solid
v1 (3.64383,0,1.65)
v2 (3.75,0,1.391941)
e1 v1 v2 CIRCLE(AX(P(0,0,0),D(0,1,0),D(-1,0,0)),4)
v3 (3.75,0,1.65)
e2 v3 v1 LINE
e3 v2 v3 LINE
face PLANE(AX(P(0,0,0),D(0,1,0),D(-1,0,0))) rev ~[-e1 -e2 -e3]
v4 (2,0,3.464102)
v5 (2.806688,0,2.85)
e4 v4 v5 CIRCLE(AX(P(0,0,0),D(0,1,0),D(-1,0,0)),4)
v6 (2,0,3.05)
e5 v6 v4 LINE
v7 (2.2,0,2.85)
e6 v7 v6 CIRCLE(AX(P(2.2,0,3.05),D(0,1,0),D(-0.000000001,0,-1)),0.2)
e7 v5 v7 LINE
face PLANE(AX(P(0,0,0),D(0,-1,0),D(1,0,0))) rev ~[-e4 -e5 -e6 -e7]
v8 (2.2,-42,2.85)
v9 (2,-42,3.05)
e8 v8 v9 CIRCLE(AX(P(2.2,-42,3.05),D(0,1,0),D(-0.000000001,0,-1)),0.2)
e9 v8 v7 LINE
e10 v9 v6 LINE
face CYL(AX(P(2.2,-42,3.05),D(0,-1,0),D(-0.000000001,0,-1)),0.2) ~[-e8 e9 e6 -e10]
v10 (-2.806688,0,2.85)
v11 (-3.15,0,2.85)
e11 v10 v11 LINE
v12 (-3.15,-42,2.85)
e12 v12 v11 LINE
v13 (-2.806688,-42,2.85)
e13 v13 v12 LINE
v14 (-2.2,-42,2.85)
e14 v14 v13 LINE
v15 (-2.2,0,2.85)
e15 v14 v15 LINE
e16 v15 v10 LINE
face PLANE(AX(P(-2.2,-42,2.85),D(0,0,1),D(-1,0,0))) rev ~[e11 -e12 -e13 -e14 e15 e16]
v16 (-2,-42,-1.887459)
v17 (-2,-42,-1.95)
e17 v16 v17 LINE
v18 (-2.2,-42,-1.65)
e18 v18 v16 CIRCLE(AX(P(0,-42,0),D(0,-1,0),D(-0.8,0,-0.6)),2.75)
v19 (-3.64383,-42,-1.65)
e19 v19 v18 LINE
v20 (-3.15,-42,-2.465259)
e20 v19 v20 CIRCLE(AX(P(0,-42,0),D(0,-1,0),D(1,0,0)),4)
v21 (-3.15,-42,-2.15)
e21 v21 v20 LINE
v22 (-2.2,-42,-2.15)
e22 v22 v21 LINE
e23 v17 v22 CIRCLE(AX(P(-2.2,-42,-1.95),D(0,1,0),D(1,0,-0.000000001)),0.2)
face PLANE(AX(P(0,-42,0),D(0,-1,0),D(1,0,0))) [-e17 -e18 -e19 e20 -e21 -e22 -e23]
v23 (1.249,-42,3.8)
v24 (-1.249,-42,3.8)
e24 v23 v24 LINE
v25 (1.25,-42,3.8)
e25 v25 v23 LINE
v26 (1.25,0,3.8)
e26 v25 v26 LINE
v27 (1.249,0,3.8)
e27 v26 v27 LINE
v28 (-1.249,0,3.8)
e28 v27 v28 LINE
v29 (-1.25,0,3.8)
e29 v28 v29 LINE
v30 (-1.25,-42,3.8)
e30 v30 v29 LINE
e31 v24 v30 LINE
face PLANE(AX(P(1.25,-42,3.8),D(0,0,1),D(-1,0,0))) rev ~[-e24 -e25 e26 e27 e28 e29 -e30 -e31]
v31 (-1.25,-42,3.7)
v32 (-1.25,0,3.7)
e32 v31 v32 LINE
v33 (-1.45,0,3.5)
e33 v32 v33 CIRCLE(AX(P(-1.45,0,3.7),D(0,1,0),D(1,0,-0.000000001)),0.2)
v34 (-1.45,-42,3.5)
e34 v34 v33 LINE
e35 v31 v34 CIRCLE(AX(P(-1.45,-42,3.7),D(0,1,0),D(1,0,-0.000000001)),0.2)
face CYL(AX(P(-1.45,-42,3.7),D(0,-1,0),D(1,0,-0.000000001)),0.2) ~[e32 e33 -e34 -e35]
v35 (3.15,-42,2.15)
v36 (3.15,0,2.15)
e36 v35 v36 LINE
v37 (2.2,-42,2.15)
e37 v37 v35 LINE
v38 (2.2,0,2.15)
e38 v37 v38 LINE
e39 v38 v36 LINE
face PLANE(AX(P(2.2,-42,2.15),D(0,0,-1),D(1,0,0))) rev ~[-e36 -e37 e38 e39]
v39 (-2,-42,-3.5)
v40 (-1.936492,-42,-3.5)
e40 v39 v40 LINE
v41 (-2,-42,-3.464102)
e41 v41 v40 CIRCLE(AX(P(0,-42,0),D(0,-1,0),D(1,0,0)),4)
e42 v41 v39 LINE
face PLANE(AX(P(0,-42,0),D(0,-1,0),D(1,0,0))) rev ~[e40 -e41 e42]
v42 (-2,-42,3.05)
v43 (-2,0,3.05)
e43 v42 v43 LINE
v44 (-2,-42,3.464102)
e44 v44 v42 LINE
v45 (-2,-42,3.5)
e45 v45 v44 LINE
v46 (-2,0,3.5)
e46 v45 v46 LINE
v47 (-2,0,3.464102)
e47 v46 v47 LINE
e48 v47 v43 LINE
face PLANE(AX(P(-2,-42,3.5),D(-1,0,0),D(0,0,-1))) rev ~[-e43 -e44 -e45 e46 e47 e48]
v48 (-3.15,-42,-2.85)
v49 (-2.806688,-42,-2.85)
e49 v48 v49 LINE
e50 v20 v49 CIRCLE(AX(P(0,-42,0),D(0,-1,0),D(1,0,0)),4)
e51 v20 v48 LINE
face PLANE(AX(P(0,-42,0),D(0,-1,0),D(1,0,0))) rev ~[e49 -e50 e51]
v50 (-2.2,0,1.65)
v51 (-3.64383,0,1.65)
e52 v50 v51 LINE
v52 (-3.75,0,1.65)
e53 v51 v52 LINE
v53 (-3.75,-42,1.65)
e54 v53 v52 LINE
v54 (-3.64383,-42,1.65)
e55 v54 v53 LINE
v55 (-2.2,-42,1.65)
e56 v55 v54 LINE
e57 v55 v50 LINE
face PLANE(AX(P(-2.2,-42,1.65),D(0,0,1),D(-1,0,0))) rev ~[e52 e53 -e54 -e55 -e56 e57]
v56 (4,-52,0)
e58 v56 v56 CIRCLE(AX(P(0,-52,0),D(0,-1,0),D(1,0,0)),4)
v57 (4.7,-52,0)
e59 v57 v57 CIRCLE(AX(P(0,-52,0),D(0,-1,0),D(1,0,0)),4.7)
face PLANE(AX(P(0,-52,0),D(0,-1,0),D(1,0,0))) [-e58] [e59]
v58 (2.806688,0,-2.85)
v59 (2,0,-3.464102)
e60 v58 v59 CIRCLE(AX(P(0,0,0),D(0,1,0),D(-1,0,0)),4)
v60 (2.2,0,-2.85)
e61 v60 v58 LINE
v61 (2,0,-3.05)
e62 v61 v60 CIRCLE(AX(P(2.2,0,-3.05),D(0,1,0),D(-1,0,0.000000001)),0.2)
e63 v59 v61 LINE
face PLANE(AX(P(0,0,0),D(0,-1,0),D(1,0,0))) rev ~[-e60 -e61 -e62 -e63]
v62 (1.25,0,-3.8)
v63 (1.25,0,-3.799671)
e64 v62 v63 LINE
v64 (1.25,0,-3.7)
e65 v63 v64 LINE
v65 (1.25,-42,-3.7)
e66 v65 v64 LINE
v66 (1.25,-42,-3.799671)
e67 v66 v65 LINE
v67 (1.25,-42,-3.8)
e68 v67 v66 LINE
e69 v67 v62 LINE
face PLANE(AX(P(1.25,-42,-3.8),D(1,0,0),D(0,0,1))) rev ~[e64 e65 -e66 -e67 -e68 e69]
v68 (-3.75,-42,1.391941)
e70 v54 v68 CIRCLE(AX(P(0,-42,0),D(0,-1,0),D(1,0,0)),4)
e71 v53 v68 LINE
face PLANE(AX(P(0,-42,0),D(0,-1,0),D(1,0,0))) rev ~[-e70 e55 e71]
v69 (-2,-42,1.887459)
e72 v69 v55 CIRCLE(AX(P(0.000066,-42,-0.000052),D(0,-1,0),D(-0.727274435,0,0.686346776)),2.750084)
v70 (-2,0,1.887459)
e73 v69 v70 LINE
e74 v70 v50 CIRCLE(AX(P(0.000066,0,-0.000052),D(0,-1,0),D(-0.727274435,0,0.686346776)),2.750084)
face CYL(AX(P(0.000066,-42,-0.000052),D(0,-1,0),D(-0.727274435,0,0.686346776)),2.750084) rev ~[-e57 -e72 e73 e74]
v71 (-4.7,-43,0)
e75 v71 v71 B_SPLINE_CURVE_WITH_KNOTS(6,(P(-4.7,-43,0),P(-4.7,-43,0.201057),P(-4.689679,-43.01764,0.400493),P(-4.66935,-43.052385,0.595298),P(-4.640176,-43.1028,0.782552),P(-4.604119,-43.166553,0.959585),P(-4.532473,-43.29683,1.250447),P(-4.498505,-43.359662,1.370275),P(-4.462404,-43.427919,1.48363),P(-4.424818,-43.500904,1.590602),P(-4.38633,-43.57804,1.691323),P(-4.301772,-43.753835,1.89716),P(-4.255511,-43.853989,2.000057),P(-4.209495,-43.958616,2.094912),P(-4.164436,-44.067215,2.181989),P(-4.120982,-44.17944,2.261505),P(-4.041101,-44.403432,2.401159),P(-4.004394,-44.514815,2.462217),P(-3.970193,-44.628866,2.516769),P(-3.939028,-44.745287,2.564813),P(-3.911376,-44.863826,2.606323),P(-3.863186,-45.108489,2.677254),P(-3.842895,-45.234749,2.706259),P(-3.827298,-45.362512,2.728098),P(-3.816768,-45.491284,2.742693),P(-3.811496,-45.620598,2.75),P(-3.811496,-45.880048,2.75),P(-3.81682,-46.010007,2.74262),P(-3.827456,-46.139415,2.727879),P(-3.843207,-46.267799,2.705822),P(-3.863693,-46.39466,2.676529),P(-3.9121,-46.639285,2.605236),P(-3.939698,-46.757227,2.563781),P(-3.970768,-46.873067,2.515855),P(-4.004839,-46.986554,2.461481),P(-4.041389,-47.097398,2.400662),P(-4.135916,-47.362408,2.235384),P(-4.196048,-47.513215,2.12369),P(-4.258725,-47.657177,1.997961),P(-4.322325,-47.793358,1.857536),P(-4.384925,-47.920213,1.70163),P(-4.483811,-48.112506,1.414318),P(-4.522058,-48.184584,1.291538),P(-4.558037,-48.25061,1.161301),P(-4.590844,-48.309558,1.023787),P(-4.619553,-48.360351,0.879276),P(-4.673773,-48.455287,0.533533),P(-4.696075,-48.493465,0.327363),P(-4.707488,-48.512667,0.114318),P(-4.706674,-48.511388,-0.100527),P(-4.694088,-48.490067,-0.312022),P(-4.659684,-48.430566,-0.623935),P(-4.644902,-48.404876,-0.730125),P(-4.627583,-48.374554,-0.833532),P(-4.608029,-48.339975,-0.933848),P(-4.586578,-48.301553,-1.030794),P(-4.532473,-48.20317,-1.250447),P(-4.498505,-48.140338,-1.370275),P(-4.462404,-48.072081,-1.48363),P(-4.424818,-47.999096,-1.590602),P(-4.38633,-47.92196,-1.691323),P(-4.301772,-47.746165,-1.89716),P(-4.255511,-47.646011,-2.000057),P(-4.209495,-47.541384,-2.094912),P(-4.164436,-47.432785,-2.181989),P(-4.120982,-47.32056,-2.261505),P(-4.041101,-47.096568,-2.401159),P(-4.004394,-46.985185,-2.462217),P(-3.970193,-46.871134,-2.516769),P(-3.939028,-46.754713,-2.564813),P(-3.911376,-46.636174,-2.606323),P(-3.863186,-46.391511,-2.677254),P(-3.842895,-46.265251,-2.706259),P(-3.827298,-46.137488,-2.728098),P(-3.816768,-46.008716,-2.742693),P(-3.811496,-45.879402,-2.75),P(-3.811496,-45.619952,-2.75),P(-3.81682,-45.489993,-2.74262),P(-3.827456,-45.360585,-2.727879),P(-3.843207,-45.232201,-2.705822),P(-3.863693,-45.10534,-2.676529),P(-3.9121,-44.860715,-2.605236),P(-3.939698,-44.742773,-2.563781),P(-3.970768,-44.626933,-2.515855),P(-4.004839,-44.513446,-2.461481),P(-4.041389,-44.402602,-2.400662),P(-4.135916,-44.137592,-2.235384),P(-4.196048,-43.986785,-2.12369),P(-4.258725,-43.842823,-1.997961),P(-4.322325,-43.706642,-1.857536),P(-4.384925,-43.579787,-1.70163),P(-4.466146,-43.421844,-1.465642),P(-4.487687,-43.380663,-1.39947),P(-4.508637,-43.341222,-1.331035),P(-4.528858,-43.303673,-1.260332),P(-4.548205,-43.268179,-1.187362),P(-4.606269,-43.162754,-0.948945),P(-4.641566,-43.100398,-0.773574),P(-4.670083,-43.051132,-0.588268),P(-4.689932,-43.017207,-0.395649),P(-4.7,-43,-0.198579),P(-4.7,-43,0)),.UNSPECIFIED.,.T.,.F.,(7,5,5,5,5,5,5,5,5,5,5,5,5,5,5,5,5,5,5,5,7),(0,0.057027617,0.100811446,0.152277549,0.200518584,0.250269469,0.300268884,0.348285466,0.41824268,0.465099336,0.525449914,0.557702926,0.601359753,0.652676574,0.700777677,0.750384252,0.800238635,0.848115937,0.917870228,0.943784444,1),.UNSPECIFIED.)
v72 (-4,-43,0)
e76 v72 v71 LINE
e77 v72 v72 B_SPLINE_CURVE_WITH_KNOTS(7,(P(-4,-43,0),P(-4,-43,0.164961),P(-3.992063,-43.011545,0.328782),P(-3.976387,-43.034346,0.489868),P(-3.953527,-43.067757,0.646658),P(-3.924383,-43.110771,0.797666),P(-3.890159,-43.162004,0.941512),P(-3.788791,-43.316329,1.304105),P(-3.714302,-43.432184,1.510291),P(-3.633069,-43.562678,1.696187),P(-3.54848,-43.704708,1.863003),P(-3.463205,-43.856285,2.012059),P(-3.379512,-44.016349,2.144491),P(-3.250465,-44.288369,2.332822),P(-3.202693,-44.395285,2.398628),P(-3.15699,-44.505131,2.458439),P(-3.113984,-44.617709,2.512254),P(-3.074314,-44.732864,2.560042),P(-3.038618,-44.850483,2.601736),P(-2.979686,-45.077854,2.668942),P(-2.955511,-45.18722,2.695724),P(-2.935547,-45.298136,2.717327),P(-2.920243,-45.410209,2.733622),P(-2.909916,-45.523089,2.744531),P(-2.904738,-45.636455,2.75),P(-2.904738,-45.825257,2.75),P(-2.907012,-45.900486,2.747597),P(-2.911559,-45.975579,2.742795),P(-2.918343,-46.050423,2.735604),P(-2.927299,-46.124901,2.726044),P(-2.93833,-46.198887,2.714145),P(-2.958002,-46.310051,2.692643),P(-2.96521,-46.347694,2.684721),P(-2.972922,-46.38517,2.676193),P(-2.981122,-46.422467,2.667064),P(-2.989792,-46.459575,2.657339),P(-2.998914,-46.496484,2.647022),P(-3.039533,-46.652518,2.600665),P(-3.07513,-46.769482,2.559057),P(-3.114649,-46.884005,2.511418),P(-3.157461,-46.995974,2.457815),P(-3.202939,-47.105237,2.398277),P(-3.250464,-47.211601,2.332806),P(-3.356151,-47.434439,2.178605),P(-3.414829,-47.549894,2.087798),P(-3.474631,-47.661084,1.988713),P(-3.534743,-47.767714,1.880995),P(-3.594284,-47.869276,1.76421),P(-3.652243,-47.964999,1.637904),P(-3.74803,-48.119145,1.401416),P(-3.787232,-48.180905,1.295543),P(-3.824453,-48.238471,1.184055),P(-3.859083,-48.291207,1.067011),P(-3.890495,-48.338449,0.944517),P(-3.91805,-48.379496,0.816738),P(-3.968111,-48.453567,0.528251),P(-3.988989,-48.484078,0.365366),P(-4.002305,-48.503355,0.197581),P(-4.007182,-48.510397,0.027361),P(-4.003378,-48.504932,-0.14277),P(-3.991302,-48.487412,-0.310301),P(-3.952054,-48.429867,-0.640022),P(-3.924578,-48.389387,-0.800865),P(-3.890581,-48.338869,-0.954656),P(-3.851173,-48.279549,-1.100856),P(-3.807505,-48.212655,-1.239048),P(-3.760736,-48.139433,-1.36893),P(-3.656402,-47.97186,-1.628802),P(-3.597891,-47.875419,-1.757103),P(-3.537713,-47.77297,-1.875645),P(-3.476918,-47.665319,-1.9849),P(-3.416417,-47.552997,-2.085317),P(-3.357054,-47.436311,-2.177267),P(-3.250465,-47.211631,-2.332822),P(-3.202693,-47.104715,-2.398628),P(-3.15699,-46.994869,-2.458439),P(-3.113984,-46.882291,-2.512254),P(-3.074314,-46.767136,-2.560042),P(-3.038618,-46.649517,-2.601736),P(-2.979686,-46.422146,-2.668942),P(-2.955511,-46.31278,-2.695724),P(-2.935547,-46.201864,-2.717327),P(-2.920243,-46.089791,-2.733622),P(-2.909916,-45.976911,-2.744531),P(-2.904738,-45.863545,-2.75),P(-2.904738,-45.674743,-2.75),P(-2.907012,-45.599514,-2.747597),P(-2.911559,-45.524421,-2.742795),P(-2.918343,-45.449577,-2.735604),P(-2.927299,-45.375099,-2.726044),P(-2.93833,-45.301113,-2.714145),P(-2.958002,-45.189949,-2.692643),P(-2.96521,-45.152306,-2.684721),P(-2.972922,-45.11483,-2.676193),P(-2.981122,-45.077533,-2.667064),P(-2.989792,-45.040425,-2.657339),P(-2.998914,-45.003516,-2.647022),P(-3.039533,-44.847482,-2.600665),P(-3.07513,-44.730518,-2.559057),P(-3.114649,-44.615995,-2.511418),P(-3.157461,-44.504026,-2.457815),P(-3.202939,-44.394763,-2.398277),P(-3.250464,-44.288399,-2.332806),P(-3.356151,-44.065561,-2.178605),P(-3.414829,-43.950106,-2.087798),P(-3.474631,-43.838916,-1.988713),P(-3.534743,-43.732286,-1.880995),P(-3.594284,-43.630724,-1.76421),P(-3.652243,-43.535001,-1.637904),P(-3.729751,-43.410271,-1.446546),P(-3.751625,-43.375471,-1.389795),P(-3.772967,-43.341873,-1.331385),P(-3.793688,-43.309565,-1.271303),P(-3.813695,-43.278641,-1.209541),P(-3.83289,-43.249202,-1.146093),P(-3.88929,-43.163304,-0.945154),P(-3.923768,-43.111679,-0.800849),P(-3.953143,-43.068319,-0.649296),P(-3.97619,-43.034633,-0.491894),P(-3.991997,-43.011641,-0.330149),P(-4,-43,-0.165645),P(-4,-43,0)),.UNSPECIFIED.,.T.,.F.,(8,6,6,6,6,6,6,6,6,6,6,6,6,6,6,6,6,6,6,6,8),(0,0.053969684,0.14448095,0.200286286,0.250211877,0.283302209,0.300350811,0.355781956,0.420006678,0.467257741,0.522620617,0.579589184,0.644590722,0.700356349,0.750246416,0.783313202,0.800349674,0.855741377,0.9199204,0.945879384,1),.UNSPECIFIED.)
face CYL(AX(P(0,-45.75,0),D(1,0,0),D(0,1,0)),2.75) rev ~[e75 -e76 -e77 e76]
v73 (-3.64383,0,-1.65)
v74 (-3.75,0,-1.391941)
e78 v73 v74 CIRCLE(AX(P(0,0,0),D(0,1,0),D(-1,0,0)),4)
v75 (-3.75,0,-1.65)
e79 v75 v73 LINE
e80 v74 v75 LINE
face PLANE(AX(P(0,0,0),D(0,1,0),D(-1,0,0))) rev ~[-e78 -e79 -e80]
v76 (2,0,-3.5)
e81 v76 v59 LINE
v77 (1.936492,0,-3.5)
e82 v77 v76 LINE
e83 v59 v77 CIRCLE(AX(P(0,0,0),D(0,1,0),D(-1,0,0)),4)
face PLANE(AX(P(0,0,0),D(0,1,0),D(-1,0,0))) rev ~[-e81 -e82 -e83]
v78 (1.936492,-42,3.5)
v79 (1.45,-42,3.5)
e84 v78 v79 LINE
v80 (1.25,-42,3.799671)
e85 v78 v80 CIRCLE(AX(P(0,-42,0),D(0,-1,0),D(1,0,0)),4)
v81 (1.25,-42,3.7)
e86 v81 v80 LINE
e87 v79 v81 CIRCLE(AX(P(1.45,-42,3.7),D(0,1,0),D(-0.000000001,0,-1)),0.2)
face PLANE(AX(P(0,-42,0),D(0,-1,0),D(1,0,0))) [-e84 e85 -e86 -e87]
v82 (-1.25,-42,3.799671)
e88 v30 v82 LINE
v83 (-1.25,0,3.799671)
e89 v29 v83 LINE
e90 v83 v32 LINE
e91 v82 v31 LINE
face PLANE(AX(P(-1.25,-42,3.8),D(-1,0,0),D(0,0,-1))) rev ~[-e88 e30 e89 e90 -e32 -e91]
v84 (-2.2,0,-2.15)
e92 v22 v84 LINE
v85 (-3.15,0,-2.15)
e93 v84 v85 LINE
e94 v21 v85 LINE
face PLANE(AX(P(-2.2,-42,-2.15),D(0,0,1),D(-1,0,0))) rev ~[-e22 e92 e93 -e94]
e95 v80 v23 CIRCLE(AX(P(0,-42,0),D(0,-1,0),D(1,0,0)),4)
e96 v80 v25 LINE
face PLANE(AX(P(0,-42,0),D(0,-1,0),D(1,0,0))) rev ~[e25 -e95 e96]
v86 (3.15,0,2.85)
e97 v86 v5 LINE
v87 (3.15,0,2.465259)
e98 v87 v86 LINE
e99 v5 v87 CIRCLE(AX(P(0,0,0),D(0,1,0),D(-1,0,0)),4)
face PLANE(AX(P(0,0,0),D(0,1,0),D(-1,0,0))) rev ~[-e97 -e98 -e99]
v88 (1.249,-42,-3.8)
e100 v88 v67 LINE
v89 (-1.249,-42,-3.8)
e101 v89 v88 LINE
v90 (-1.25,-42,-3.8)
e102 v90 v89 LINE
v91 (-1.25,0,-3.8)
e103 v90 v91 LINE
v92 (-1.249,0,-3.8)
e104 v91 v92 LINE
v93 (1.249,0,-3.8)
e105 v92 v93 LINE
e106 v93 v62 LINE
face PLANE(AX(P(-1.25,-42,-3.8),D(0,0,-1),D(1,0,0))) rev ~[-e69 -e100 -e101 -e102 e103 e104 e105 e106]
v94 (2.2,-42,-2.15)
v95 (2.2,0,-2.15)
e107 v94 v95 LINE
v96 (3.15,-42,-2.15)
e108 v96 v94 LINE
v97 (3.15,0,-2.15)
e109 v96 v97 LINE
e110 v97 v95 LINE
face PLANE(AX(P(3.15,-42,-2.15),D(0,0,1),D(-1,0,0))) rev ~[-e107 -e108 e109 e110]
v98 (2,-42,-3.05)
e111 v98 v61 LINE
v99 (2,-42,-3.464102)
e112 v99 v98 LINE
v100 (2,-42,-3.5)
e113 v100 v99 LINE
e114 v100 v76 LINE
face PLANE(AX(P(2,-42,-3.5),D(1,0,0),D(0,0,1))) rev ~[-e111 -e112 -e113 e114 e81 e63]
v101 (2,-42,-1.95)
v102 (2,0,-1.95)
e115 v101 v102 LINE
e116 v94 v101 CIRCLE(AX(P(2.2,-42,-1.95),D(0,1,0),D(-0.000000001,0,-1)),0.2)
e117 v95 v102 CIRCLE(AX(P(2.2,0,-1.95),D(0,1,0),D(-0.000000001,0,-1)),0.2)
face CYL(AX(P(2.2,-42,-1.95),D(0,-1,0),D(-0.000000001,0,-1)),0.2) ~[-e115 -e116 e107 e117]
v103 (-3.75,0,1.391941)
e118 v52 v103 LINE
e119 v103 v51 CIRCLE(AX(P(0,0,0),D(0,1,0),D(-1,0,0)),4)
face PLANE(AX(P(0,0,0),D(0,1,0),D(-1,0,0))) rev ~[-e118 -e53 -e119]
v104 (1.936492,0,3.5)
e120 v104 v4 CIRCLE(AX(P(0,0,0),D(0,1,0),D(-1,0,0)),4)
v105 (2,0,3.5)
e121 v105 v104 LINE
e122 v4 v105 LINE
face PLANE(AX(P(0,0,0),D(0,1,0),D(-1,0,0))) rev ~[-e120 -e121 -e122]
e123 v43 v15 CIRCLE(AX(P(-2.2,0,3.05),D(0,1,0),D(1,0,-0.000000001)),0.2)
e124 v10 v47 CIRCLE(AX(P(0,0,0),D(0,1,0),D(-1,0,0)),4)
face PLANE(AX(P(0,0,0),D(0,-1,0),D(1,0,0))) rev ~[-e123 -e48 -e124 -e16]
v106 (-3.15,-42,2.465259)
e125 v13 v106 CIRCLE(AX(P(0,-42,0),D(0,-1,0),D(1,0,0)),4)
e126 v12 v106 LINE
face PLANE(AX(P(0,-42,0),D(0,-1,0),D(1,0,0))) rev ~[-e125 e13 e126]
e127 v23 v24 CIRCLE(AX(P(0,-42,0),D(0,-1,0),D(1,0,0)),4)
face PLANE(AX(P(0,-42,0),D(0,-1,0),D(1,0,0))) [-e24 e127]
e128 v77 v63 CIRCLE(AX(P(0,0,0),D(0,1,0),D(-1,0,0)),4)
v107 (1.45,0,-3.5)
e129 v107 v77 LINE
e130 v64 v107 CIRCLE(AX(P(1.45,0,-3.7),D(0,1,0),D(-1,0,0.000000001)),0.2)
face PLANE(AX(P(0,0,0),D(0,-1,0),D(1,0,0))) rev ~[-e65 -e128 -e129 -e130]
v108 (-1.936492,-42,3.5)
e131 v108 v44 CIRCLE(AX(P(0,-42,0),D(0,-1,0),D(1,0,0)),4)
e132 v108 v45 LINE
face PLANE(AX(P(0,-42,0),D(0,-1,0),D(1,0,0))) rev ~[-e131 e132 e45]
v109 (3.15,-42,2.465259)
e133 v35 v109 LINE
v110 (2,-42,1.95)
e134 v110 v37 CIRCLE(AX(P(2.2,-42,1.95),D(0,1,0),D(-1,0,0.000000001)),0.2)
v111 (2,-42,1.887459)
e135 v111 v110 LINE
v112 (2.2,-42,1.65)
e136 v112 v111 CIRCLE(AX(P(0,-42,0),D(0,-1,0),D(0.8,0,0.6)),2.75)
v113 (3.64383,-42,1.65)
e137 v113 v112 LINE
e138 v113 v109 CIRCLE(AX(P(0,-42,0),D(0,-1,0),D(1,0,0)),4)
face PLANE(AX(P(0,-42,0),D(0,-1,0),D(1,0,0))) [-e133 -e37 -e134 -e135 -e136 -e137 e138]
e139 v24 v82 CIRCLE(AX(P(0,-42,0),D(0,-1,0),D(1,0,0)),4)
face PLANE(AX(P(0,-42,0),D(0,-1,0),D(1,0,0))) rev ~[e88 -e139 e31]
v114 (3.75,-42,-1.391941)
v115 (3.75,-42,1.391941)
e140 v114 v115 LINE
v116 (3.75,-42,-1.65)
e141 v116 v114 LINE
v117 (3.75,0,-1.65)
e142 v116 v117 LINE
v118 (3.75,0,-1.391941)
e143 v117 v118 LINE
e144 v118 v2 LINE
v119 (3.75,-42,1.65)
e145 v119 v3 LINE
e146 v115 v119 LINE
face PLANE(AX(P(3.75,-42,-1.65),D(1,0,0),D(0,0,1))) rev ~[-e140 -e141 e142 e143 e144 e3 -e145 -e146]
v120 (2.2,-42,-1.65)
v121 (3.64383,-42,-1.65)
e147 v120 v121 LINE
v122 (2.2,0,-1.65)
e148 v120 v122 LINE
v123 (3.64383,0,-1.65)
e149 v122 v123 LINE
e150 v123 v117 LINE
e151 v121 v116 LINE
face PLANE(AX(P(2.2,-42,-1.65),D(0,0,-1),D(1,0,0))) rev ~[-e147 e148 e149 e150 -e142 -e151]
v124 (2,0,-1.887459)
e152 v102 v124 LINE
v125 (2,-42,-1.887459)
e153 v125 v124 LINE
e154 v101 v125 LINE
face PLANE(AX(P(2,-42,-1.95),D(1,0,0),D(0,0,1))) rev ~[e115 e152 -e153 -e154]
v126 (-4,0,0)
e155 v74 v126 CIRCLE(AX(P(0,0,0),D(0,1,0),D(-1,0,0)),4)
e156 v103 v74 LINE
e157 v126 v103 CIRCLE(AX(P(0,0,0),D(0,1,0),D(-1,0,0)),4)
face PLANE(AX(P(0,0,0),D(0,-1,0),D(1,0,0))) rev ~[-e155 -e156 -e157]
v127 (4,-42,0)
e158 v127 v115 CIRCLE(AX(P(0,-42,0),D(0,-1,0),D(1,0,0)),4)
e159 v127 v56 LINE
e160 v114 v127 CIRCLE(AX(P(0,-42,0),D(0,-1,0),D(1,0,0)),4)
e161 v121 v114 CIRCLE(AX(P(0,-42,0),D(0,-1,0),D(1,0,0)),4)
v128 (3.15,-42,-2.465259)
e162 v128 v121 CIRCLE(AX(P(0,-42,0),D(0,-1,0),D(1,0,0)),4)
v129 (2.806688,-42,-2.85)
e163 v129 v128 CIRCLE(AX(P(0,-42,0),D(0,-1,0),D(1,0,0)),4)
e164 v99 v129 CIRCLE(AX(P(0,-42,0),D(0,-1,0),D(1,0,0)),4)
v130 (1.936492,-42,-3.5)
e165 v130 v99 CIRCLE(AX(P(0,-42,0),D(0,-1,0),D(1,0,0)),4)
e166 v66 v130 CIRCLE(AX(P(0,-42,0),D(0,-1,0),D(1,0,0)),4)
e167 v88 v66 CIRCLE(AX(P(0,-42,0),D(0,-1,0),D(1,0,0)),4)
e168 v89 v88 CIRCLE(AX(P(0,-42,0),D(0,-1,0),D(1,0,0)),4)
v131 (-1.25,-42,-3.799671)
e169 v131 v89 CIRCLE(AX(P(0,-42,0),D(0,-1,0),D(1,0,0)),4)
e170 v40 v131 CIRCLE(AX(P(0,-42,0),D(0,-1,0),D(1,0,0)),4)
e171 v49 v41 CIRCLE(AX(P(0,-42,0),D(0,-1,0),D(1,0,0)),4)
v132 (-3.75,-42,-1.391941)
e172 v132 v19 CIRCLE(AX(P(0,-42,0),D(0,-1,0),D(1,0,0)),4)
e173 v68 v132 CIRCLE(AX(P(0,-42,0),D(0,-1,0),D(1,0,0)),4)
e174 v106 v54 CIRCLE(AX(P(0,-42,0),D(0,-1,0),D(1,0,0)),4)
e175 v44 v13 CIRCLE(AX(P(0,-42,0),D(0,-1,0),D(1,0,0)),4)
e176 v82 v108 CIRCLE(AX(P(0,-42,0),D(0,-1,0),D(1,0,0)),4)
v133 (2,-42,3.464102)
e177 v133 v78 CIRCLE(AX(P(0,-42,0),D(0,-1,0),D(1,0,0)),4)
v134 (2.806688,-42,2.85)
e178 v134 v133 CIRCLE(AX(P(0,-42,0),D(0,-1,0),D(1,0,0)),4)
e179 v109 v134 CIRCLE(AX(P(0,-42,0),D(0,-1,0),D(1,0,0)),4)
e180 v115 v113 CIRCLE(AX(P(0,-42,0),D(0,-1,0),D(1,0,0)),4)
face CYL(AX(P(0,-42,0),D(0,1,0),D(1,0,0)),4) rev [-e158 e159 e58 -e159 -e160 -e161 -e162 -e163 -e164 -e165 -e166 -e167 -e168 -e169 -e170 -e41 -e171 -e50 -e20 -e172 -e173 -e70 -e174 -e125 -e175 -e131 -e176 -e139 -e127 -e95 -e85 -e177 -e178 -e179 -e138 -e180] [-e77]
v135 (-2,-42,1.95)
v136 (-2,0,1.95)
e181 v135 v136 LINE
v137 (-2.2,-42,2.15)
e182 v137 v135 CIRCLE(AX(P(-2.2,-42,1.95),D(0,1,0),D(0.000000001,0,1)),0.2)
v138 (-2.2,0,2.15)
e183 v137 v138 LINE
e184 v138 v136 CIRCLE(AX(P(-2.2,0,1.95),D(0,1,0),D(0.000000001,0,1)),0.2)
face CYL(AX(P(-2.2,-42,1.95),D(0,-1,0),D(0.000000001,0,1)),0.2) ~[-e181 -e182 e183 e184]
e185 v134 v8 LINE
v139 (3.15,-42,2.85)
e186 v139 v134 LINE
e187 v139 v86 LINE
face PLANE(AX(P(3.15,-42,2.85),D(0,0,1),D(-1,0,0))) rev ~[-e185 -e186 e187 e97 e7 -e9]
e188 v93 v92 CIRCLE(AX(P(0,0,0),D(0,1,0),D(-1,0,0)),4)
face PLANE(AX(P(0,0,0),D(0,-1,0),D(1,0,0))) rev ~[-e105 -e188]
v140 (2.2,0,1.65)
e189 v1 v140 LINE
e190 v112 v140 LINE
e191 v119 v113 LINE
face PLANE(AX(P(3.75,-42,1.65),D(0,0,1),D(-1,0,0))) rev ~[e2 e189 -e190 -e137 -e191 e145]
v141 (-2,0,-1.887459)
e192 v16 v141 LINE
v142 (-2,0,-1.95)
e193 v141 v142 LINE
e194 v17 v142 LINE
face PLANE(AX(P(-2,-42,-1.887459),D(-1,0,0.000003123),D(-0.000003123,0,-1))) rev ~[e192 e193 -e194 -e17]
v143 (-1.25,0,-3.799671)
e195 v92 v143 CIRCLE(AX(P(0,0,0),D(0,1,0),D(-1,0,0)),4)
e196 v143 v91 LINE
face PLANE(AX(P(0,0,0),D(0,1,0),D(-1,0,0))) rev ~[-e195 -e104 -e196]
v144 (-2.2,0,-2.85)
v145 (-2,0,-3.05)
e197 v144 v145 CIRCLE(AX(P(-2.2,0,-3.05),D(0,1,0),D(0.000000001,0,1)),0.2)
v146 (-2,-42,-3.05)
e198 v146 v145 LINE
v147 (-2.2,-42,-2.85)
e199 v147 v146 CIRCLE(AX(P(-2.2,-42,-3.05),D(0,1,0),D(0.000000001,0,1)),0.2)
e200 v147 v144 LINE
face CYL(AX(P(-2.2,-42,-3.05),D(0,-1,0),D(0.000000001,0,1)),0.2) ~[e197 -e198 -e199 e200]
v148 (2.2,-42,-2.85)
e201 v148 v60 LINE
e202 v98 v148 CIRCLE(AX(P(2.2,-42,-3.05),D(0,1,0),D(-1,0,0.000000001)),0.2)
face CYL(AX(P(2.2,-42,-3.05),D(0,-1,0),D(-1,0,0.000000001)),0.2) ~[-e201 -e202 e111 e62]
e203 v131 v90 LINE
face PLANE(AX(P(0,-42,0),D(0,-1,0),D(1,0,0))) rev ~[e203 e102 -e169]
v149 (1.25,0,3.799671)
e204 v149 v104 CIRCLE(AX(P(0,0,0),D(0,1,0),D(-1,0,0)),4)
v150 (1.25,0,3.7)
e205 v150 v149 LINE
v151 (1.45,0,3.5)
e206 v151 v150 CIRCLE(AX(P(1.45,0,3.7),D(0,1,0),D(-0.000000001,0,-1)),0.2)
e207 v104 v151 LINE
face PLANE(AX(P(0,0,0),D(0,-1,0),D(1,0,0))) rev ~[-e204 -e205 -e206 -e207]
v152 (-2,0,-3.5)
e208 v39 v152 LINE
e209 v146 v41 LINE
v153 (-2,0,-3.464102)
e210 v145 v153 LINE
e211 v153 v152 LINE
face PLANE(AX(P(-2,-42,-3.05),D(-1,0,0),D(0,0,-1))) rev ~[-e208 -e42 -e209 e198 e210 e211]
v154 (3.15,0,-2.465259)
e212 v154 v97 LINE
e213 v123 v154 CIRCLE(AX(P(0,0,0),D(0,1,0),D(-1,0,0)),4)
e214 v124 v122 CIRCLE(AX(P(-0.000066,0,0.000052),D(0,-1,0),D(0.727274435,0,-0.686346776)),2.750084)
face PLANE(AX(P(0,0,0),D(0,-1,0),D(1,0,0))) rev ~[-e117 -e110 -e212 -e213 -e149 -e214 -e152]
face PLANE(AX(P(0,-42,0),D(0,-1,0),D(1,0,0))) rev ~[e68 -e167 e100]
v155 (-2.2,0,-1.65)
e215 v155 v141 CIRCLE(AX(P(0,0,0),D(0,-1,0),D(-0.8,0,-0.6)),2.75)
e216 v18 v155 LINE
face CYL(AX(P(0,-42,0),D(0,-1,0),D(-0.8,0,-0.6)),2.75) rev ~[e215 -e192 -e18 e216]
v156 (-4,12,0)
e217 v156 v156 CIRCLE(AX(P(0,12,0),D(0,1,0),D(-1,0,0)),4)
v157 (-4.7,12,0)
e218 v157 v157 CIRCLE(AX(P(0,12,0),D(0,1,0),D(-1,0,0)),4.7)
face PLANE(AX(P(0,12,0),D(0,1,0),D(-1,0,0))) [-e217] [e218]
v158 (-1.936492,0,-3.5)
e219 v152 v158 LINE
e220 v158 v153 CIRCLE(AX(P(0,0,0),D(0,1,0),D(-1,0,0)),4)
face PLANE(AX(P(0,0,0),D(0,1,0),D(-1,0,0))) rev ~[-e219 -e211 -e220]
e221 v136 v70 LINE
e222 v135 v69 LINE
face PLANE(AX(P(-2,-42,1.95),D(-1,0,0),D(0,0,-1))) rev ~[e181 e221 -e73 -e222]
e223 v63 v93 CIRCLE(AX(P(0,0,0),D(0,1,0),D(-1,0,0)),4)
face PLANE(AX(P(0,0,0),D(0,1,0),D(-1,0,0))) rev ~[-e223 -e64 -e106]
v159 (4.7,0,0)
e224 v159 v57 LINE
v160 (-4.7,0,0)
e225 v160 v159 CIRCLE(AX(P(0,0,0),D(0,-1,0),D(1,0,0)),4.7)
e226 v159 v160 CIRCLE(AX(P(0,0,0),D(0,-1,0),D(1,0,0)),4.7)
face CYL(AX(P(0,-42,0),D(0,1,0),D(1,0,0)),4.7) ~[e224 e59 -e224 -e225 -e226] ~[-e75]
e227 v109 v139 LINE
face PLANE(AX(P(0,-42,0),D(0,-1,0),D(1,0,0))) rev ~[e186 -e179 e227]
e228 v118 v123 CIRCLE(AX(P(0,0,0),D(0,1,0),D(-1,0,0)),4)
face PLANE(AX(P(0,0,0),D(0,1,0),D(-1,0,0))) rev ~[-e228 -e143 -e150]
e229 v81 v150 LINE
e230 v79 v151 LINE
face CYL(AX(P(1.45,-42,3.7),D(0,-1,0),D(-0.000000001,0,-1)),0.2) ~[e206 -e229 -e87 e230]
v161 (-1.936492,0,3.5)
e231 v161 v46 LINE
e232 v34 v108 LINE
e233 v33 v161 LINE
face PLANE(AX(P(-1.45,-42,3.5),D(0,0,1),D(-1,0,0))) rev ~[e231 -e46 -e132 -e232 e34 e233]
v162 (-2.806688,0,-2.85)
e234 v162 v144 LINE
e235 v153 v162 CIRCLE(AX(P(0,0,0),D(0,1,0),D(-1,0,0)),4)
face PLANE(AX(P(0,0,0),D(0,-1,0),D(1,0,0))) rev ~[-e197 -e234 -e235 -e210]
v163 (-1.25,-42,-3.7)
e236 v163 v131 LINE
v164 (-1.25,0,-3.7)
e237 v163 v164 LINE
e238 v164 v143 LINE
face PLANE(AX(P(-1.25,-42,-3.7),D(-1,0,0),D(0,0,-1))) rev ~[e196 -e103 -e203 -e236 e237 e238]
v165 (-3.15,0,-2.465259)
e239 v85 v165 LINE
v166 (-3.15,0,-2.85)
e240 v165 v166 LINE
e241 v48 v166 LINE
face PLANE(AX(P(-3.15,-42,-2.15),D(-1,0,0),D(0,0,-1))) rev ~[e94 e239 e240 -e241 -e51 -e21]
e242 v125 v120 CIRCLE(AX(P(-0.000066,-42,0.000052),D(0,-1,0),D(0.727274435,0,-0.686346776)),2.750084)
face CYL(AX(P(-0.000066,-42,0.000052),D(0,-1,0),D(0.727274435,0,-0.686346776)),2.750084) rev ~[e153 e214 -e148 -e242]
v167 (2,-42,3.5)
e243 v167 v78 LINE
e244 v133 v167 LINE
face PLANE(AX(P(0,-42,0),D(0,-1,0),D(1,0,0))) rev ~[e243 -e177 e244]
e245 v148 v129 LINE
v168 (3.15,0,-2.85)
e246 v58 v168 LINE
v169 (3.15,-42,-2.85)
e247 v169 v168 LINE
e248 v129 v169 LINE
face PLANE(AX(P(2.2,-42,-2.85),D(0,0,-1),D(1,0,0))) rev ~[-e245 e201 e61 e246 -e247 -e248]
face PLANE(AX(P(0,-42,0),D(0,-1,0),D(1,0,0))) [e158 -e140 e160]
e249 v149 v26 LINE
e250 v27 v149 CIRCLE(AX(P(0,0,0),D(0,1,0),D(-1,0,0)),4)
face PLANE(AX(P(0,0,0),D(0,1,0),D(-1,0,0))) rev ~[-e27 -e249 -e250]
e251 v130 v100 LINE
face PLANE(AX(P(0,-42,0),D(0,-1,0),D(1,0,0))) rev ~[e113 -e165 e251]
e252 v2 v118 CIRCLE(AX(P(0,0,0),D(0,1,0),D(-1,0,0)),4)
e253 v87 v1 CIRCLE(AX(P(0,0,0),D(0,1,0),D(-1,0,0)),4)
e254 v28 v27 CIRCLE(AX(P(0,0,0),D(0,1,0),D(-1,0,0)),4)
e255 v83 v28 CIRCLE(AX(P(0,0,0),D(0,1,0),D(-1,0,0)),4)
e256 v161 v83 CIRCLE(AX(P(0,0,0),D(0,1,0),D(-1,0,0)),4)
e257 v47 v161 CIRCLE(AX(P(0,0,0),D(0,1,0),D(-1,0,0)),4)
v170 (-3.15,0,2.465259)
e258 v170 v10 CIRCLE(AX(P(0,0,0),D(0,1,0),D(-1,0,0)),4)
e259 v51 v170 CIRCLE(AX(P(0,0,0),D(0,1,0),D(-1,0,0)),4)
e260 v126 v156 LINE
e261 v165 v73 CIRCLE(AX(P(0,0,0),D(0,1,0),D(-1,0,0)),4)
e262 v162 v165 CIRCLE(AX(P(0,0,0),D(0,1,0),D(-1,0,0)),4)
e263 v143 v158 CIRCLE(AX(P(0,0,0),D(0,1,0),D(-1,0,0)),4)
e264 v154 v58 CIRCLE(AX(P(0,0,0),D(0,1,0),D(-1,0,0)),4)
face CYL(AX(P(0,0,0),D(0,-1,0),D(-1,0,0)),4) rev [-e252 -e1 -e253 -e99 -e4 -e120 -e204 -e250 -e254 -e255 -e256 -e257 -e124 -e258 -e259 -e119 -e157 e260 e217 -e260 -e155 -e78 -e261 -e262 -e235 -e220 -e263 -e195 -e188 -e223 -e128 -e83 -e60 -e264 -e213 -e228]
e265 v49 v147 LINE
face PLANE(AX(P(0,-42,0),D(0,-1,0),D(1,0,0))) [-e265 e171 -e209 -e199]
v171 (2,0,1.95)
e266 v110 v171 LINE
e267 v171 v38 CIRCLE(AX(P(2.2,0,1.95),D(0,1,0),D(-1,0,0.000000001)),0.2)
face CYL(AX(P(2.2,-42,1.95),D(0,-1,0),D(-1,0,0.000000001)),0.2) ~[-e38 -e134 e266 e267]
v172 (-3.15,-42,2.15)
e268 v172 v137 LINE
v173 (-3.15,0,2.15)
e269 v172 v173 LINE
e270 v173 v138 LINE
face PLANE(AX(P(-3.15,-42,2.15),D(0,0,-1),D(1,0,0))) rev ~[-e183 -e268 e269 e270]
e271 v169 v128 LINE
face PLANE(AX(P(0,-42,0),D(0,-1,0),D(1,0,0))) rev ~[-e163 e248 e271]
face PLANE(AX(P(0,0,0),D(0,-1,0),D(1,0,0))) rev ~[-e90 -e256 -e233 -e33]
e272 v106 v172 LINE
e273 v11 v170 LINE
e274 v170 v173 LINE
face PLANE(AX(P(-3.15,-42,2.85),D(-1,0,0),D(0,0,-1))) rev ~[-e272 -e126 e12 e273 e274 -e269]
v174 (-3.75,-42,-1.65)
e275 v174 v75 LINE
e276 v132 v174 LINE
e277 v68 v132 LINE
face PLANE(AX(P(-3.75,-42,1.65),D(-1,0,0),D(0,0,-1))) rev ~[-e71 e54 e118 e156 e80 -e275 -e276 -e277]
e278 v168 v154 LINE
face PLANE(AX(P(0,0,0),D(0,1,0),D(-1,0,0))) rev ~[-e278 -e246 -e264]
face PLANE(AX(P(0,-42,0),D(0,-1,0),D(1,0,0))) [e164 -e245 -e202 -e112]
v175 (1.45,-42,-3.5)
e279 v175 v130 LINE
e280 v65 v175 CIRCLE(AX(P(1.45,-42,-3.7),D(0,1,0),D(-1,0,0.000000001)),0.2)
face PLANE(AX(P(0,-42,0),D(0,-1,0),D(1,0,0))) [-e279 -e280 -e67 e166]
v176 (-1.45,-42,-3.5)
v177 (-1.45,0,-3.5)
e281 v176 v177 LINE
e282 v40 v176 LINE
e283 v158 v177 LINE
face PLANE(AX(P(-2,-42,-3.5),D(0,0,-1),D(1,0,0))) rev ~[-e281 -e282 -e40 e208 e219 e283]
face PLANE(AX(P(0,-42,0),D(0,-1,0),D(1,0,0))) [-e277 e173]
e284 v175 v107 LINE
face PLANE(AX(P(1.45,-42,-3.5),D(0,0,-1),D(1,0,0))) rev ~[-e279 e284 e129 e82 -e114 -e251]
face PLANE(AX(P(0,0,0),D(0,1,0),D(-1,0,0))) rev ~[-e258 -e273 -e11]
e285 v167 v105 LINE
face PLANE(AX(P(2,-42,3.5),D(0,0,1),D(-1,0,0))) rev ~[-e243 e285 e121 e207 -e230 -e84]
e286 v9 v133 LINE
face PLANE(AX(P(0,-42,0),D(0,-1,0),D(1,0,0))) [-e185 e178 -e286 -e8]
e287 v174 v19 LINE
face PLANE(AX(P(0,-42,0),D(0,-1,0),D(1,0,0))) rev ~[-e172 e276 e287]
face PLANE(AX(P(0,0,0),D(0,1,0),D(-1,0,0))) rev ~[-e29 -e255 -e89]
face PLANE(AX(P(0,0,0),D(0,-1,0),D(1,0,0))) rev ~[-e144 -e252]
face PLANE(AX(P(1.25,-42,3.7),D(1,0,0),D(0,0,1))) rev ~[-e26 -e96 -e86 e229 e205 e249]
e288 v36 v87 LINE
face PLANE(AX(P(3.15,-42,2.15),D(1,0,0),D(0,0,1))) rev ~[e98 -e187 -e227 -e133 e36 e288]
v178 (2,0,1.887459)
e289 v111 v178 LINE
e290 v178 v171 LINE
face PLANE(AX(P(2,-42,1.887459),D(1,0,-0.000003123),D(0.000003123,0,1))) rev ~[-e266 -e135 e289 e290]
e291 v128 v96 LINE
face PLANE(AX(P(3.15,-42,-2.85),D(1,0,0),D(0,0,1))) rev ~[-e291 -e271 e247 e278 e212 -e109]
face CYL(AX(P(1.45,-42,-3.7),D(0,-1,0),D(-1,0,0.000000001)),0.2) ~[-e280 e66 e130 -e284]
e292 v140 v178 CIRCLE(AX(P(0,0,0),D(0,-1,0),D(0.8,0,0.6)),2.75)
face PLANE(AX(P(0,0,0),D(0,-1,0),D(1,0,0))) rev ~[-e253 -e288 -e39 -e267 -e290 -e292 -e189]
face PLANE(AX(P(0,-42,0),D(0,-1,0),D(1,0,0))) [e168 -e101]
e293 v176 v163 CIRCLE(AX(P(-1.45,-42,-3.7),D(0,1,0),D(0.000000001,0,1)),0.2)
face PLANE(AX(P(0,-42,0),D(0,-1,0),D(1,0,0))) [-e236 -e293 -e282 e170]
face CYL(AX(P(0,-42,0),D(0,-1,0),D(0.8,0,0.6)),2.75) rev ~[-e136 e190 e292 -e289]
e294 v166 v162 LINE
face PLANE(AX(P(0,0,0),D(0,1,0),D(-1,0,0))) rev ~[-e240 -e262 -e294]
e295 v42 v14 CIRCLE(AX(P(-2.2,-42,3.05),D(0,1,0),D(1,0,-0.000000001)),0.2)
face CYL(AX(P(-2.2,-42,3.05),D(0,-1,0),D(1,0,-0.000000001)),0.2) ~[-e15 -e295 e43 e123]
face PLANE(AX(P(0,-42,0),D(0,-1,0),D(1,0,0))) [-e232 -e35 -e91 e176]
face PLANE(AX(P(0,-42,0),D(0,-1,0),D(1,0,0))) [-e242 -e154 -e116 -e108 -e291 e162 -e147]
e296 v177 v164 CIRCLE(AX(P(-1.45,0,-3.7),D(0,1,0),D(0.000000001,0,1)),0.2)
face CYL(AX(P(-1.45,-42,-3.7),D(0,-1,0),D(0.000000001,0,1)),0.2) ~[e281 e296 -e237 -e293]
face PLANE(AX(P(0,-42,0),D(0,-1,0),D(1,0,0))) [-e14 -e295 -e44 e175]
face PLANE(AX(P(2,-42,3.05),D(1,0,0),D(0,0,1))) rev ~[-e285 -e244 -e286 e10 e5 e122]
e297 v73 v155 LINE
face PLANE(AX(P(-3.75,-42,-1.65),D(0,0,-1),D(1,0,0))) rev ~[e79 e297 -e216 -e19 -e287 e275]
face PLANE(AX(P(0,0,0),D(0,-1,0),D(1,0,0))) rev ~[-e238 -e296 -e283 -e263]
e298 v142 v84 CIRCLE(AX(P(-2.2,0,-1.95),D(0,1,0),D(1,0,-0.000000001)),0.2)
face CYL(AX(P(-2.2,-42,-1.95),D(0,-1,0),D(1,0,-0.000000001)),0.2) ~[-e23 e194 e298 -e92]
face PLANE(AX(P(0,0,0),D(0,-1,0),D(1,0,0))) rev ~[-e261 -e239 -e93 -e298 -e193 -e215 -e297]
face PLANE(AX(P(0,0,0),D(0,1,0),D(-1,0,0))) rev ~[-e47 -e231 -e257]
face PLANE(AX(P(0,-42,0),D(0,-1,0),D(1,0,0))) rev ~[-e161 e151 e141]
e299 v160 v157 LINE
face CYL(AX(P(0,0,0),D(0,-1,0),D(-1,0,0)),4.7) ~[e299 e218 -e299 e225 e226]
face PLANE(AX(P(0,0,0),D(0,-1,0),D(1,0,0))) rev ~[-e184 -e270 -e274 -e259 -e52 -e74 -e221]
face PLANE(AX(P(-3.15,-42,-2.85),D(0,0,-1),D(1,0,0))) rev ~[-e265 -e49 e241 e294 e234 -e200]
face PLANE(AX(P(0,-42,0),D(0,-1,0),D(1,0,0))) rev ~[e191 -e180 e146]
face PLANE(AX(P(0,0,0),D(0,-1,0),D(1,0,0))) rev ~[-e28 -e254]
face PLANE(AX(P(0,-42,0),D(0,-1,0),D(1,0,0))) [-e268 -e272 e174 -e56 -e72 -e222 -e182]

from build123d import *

# Parameters (mm, degrees)
F3_R      = 4.7
F4_DEPTH  = 42
F8_DEPTH  = 42
F6_R      = 4.7
F6_R_2    = 4
F9_DEPTH  = 10
F7_R      = 4.7
F7_R_2    = 4
F10_DEPTH = 12
F11_R     = 2.75
F12_DEPTH = 4.701


# Not quite as in the source:
# - ends of sketch curves that miss each other by under 0.0002 mm in the source are joined


with BuildPart() as f4:
    # F3 (on Front) → F4 (new body)
    with BuildSketch(Plane.XZ):
        Circle(F3_R)
    extrude(amount=F4_DEPTH)

    # F5 (on face) → F8 (cut, through all)
    with BuildSketch(Plane.XZ.offset(42)):
        with BuildLine():
            Line((-1.25, -3.8), (0, -3.8))
            Line((0, -3.8), (1.25, -3.8))
            Line((1.25, -3.8), (1.25, -3.7))
            ThreePointArc((1.25, -3.7), (1.3085786438, -3.5585786438), (1.45, -3.5))
            Line((1.45, -3.5), (2, -3.5))
            Line((2, -3.5), (2, -3.05))
            ThreePointArc((2, -3.05), (2.0585786438, -2.9085786438), (2.2, -2.85))
            Line((2.2, -2.85), (3.15, -2.85))
            Line((3.15, -2.85), (3.15, -2.15))
            Line((3.15, -2.15), (2.2, -2.15))
            ThreePointArc((2.2, -2.15), (2.0585786438, -2.0914213562), (2, -1.95))
            Line((2, -1.95), (2, -1.887459))
            ThreePointArc((2, -1.887459), (2.1033535752, -1.771554046), (2.2, -1.65))
            Line((2.2, -1.65), (3.75, -1.65))
            Line((3.75, -1.65), (3.75, 0))
            Line((3.75, 0), (3.75, 1.65))
            Line((3.75, 1.65), (2.2, 1.65))
            ThreePointArc((2.2, 1.65), (2.1033535752, 1.771554046), (1.9999998047, 1.8874588157))
            Line((1.9999998047, 1.8874588157), (2, 1.95))
            ThreePointArc((2, 1.95), (2.0585786438, 2.0914213562), (2.2, 2.15))
            Line((2.2, 2.15), (3.15, 2.15))
            Line((3.15, 2.15), (3.15, 2.85))
            Line((3.15, 2.85), (2.2, 2.85))
            ThreePointArc((2.2, 2.85), (2.0585786438, 2.9085786438), (2, 3.05))
            Line((2, 3.05), (2, 3.5))
            Line((2, 3.5), (1.45, 3.5))
            ThreePointArc((1.45, 3.5), (1.3085786438, 3.5585786438), (1.25, 3.7))
            Line((1.25, 3.7), (1.25, 3.8))
            Line((1.25, 3.8), (0, 3.8))
            Line((0, 3.8), (-1.25, 3.8))
            Line((-1.25, 3.8), (-1.25, 3.7))
            ThreePointArc((-1.25, 3.7), (-1.3085786438, 3.5585786438), (-1.45, 3.5))
            Line((-1.45, 3.5), (-2, 3.5))
            Line((-2, 3.5), (-2, 3.05))
            ThreePointArc((-2, 3.05), (-2.0585786438, 2.9085786438), (-2.2, 2.85))
            Line((-2.2, 2.85), (-3.15, 2.85))
            Line((-3.15, 2.85), (-3.15, 2.15))
            Line((-3.15, 2.15), (-2.2, 2.15))
            ThreePointArc((-2.2, 2.15), (-2.0585786438, 2.0914213562), (-2, 1.95))
            Line((-2, 1.95), (-2, 1.887459))
            ThreePointArc((-2, 1.887459), (-2.1033535752, 1.771554046), (-2.2, 1.65))
            Line((-2.2, 1.65), (-3.75, 1.65))
            Line((-3.75, 1.65), (-3.75, 0))
            Line((-3.75, 0), (-3.75, -1.65))
            Line((-3.75, -1.65), (-2.2, -1.65))
            ThreePointArc((-2.2, -1.65), (-2.1033535752, -1.771554046), (-1.9999998047, -1.8874588157))
            Line((-1.9999998047, -1.8874588157), (-2, -1.95))
            ThreePointArc((-2, -1.95), (-2.0585786438, -2.0914213562), (-2.2, -2.15))
            Line((-2.2, -2.15), (-3.15, -2.15))
            Line((-3.15, -2.15), (-3.15, -2.85))
            Line((-3.15, -2.85), (-2.2, -2.85))
            ThreePointArc((-2.2, -2.85), (-2.0585786438, -2.9085786438), (-2, -3.05))
            Line((-2, -3.05), (-2, -3.5))
            Line((-2, -3.5), (-1.45, -3.5))
            ThreePointArc((-1.45, -3.5), (-1.3085786438, -3.5585786438), (-1.25, -3.7))
            Line((-1.25, -3.7), (-1.25, -3.8))
        make_face()
    extrude(amount=-F8_DEPTH, mode=Mode.SUBTRACT)

    # F6 (on face) → F9 (join)
    with BuildSketch(Plane.XZ.offset(42)):
        Circle(F6_R)
        Circle(F6_R_2, mode=Mode.SUBTRACT)
    extrude(amount=F9_DEPTH)

    # F7 (on face) → F10 (join)
    with BuildSketch(Plane(origin=(0, 0, 0), x_dir=(-1, 0, 0), z_dir=(0, 1, 0))):
        Circle(F7_R)
        Circle(F7_R_2, mode=Mode.SUBTRACT)
    extrude(amount=F10_DEPTH)

    # F11 (on Right) → F12 (cut, through all)
    with BuildSketch(Plane.YZ):
        with Locations((-45.75, 0)):
            Circle(F11_R)
    extrude(amount=-F12_DEPTH, mode=Mode.SUBTRACT)


solid = f4.part
